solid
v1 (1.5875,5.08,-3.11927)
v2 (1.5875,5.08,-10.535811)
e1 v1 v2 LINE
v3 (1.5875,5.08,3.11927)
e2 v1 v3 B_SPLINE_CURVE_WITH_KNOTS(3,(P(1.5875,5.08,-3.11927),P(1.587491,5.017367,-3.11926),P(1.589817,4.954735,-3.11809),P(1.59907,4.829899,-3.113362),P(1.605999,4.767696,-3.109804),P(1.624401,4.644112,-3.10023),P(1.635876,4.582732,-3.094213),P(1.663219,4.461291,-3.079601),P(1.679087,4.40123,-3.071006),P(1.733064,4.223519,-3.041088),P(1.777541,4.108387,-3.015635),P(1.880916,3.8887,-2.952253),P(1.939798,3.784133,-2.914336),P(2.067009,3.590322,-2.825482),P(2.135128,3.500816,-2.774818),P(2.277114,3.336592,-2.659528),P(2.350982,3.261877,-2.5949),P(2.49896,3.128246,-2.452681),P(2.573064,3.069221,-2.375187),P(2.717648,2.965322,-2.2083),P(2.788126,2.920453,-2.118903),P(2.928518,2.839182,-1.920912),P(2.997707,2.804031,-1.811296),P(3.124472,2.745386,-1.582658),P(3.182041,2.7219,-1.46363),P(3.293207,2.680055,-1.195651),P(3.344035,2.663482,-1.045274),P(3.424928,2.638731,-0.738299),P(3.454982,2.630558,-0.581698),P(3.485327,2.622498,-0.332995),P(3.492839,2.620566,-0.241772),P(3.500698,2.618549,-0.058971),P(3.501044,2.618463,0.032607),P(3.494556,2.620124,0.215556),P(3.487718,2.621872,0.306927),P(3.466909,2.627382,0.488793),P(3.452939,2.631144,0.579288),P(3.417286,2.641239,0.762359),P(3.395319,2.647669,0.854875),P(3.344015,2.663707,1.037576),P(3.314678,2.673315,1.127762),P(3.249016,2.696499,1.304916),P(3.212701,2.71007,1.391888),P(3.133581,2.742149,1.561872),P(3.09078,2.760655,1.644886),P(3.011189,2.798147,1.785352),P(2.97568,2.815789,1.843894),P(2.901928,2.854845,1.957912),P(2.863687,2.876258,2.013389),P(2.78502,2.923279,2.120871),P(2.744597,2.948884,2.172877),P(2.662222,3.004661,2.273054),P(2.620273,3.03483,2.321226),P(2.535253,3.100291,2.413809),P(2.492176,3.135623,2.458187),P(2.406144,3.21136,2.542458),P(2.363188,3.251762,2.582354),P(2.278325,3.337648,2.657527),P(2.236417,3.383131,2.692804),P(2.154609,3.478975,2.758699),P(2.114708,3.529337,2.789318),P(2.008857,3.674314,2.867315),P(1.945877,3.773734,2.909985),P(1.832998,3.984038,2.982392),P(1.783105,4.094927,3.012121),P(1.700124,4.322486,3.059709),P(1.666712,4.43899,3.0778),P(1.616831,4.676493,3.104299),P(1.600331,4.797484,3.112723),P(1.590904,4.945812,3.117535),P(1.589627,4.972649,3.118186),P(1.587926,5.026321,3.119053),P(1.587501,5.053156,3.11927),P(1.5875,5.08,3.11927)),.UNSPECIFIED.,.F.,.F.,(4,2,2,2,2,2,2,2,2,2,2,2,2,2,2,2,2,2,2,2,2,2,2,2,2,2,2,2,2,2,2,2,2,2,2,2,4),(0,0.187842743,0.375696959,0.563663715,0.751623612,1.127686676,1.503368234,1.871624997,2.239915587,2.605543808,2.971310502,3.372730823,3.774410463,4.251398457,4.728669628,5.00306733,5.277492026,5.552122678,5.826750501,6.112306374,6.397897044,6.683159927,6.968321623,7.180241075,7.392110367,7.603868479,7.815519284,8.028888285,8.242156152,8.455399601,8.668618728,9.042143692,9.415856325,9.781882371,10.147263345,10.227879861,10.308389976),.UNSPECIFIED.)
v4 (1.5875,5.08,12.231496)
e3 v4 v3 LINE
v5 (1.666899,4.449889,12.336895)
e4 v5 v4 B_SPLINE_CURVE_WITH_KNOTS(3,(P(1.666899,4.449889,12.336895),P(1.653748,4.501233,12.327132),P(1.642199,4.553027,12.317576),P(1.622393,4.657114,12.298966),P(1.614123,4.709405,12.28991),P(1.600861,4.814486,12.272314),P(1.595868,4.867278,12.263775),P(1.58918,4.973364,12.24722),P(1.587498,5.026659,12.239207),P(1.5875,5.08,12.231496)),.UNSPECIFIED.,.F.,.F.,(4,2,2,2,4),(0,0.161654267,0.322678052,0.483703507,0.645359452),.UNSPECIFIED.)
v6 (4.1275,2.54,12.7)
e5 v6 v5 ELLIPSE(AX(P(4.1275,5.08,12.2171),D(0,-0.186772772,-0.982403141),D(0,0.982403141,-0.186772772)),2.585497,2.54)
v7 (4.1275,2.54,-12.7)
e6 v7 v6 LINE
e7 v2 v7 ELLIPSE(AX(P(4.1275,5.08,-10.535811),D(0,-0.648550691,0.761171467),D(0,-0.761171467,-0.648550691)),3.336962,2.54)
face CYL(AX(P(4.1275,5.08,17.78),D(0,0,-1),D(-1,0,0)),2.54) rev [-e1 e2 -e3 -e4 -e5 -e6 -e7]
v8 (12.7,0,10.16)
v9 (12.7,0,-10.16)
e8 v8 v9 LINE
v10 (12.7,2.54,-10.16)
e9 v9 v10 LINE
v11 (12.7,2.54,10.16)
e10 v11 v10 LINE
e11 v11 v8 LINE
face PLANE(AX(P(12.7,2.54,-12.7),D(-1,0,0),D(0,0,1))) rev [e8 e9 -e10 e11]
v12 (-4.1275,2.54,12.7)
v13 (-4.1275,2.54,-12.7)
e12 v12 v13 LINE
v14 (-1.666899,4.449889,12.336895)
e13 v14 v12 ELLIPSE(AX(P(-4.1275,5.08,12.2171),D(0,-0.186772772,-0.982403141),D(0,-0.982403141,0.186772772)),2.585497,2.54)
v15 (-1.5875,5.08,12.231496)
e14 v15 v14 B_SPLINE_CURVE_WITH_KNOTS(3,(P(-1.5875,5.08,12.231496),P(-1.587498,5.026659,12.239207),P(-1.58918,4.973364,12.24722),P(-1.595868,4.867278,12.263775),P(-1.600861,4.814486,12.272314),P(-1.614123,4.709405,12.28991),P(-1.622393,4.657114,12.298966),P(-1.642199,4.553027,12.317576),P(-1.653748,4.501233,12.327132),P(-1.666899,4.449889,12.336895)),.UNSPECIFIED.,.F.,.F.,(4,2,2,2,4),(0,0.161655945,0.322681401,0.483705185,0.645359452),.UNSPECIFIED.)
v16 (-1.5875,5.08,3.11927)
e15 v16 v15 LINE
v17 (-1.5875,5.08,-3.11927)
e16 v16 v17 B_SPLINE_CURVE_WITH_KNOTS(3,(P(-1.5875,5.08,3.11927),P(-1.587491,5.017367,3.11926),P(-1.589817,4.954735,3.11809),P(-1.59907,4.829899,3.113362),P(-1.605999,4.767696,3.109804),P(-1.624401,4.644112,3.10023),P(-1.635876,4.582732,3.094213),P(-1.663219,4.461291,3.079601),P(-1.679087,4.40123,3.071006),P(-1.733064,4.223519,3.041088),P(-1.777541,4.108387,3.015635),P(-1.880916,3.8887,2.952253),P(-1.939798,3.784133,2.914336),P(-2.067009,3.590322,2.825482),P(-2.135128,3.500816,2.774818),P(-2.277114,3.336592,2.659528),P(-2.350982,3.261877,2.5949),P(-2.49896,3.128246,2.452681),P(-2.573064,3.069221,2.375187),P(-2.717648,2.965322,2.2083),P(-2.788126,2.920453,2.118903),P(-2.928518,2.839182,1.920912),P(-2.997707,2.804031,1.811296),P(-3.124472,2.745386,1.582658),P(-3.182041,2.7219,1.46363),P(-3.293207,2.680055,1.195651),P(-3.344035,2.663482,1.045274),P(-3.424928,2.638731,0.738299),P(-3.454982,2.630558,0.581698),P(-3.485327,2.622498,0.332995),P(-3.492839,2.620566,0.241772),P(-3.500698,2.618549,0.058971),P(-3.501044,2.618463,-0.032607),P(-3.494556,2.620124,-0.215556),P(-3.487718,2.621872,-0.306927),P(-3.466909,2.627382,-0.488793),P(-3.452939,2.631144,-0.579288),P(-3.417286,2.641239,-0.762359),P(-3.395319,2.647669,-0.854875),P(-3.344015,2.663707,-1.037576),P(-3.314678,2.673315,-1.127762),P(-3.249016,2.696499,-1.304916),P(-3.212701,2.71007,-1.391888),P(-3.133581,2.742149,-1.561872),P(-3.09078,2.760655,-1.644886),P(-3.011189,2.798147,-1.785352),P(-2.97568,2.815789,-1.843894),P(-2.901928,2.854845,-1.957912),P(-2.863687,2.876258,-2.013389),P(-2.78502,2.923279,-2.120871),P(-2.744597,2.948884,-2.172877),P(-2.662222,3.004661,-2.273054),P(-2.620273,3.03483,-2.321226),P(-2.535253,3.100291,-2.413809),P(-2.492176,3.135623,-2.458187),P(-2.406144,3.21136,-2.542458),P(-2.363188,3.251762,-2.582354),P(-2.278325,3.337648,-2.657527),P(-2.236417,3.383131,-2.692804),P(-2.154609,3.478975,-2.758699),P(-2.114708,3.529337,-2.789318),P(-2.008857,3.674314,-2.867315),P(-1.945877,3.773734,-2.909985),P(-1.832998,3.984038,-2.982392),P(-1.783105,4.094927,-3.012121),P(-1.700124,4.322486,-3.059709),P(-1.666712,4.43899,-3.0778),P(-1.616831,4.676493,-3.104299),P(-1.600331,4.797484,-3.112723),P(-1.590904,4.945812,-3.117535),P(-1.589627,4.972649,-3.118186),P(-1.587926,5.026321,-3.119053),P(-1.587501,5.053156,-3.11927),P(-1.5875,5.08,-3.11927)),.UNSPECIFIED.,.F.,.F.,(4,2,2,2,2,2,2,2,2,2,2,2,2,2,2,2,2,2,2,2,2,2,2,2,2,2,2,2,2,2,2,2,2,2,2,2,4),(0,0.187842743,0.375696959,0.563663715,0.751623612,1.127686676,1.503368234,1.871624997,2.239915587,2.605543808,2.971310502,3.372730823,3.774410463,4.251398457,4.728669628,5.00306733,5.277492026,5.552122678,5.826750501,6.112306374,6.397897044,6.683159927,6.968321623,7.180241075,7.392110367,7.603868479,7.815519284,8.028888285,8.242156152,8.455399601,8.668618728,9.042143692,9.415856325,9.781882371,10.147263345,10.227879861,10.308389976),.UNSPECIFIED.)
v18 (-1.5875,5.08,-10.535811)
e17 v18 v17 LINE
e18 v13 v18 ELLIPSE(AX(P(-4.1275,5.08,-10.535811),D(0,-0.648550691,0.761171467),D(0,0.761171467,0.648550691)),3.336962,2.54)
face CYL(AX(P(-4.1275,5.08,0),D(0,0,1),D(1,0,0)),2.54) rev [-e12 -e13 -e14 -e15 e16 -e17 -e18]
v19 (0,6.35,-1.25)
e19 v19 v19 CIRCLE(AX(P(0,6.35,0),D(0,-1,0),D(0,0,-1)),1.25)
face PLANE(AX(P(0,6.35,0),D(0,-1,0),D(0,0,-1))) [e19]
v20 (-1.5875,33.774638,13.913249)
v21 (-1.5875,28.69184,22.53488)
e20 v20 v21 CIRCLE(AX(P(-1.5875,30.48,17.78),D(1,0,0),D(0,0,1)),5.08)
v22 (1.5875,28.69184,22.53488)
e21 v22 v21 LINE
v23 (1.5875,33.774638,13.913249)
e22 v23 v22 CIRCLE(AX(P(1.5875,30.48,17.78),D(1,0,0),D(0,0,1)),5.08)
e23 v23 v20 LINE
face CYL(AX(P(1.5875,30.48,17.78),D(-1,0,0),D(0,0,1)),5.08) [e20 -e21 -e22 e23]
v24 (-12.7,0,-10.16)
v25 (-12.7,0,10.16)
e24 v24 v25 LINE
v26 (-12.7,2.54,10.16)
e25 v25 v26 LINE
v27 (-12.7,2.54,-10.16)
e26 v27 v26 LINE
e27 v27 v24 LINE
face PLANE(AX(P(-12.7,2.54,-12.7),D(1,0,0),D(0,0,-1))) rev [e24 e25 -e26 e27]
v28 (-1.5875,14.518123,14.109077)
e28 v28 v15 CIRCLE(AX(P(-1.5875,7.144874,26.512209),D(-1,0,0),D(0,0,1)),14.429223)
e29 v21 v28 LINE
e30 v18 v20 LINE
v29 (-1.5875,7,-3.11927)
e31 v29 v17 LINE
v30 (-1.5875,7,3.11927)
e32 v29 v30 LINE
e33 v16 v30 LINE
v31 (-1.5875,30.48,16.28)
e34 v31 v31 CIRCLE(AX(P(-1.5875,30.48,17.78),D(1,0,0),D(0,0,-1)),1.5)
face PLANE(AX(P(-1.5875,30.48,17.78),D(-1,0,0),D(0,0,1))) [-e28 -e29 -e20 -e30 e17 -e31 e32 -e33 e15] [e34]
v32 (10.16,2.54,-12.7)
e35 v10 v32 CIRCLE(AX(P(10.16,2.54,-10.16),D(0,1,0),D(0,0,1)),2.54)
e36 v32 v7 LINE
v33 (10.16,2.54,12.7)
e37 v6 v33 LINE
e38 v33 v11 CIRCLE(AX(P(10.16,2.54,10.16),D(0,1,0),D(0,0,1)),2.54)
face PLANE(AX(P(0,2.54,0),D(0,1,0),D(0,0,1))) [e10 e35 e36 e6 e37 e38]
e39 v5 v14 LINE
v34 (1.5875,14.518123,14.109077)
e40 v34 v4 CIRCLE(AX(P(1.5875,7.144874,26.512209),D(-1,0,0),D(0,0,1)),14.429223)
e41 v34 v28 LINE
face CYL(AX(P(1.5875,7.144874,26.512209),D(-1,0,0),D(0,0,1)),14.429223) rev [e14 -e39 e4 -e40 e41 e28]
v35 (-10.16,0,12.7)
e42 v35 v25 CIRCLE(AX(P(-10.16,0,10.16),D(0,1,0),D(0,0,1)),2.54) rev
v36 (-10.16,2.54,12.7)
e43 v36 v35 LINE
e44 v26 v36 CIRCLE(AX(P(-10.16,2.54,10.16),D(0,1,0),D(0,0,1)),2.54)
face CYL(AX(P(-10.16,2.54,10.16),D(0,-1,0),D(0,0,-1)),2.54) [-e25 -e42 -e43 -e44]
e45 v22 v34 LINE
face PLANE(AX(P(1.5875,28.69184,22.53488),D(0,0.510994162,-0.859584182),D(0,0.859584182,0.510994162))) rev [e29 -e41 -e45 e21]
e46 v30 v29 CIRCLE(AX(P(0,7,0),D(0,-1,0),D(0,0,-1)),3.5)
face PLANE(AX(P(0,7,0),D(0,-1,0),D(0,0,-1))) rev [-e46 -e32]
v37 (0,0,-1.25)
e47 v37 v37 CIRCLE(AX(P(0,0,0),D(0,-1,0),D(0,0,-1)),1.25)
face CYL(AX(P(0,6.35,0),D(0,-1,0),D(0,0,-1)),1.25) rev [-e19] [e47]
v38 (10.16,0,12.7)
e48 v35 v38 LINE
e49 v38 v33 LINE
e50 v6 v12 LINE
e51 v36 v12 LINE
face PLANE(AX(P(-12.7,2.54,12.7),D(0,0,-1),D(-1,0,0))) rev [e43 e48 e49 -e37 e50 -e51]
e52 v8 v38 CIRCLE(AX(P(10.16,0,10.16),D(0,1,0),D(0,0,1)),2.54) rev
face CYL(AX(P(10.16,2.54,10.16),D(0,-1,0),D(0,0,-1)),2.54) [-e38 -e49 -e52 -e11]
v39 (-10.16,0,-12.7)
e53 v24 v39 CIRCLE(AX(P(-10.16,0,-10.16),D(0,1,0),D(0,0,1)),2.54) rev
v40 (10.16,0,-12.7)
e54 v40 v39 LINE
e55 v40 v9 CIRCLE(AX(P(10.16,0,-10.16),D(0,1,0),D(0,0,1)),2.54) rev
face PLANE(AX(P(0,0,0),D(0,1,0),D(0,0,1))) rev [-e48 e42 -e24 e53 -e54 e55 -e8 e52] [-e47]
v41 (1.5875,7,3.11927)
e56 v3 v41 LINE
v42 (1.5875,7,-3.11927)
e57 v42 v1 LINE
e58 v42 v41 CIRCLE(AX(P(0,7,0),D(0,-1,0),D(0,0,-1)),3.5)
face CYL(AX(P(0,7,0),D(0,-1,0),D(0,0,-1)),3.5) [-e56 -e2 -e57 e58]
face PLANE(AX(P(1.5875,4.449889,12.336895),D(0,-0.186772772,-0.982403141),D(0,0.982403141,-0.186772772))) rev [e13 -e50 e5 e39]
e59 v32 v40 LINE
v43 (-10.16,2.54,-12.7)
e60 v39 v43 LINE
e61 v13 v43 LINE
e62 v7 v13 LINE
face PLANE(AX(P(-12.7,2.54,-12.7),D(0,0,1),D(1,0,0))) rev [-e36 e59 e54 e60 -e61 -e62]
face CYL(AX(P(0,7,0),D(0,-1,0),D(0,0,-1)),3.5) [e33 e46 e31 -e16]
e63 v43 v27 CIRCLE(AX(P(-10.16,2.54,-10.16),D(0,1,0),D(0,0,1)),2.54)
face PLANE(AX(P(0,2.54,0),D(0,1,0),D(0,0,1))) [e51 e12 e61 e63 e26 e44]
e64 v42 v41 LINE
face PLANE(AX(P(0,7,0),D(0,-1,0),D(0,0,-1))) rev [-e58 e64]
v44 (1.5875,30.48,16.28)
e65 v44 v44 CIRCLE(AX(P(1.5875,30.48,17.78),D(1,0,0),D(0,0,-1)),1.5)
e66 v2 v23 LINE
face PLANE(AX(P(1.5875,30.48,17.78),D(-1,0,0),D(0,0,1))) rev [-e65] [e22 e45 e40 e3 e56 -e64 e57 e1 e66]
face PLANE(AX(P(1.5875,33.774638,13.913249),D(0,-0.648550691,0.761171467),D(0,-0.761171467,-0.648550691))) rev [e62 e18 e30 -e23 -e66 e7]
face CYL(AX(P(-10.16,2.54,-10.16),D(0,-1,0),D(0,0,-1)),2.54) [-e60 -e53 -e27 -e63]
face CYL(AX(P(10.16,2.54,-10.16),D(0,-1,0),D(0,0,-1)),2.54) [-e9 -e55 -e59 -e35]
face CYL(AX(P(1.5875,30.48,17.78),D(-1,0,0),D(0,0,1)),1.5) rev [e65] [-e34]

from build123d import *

# Parameters (mm, degrees)
SKETCH1_W           = 25.4
SKETCH1_H           = 25.4
BOSS_EXTRUDE1_DEPTH = 2.54
SKETCH3_R           = 1.5
BOSS_EXTRUDE2_DEPTH = 1.5875
FILLET1_START       = -12.7000001
FILLET1_DEPTH       = 25.4000001
FILLET1_START_2     = -5
FILLET1_2_DEPTH     = 10
FILLET2_R           = 2.54
SKETCH4_R           = 3.5
BOSS_EXTRUDE3_DEPTH = 7
SKETCH5_R           = 1.25
CUT_EXTRUDE1_DEPTH  = 6.35


with BuildPart() as part:
    # Sketch1 → Boss-Extrude1 (new body)
    with BuildSketch(Plane(origin=(0, 0, 0), x_dir=(1, 0, 0), z_dir=(0, 1, 0))):
        Rectangle(SKETCH1_W, SKETCH1_H)
    extrude(amount=BOSS_EXTRUDE1_DEPTH)

    # Sketch3 → Boss-Extrude2 (add, symmetric)
    with BuildSketch(Plane(origin=(0, 0, 0), x_dir=(0, 0, -1), z_dir=(1, 0, 0))):
        with BuildLine():
            Line((-22.53488, 28.69184), (-14.109077454, 14.518123111))
            ThreePointArc((-14.109077454, 14.518123111), (-12.301446379, 9.646212675), (-12.336895325, 4.449888515))
            Line((-12.336895325, 4.449888515), (-12.7, 2.54))
            Line((-12.7, 2.54), (12.7, 2.54))
            Line((12.7, 2.54), (-13.91324895, 33.774637509))
            ThreePointArc((-13.91324895, 33.774637509), (-20.359903271, 34.856128324), (-22.53488, 28.69184))
        make_face()
        with Locations((-17.78, 30.48)):
            Circle(SKETCH3_R, mode=Mode.SUBTRACT)
    extrude(amount=BOSS_EXTRUDE2_DEPTH, both=True)

    # Fillet1: read off the stored shape, not the designer's step
    # Fillet1 outline → Fillet1 (add)
    with BuildSketch(Plane.XY.offset(FILLET1_START)):
        with BuildLine():
            ThreePointArc((-1.5875, 5.08), (-2.331448776, 3.283948776), (-4.1275, 2.54))
            Line((-4.1275, 2.54), (-1.5875, 2.54))
            Line((-1.5875, 2.54), (-1.5875, 5.08))
        make_face()
        with BuildLine():
            Line((1.5875, 2.54), (4.1275, 2.54))
            ThreePointArc((4.1275, 2.54), (2.331448776, 3.283948776), (1.5875, 5.08))
            Line((1.5875, 5.08), (1.5875, 2.54))
        make_face()
    extrude(amount=FILLET1_DEPTH)

    # Fillet1 2 outline → Fillet1 2 (cut)
    with BuildSketch(Plane.YZ.offset(FILLET1_START_2)):
        Polygon((5.08, -10.535811211), (2.54, -12.7), (5.08, -12.7000001), align=None)
        with BuildLine():
            Line((5.08, 12.7), (2.54, 12.7))
            Line((2.54, 12.7), (4.449888515, 12.336895325))
            ThreePointArc((4.449888515, 12.336895325), (4.764360857, 12.280707955), (5.08, 12.231496116))
            Line((5.08, 12.231496116), (5.08, 12.7))
        make_face()
    extrude(amount=FILLET1_2_DEPTH, mode=Mode.SUBTRACT)

    # Fillet2
    fillet2_edges = [part.edges().sort_by_distance(p)[0] for p in [
        (12.7, 1.27, -12.7),
        (12.7, 1.27, 12.7),
        (-12.7, 1.27, 12.7),
        (-12.7, 1.27, -12.7),
    ]]
    fillet(fillet2_edges, radius=FILLET2_R)

    # Sketch4 → Boss-Extrude3 (add)
    with BuildSketch(Plane.XZ):
        Circle(SKETCH4_R)
    extrude(amount=-BOSS_EXTRUDE3_DEPTH)

    # Sketch5 → Cut-Extrude1 (cut)
    with BuildSketch(Plane.XZ):
        with Locations(Location((0, 0, 0), (0, 0, 270))):
            Circle(SKETCH5_R)
    extrude(amount=-CUT_EXTRUDE1_DEPTH, mode=Mode.SUBTRACT)


solid = part.part
